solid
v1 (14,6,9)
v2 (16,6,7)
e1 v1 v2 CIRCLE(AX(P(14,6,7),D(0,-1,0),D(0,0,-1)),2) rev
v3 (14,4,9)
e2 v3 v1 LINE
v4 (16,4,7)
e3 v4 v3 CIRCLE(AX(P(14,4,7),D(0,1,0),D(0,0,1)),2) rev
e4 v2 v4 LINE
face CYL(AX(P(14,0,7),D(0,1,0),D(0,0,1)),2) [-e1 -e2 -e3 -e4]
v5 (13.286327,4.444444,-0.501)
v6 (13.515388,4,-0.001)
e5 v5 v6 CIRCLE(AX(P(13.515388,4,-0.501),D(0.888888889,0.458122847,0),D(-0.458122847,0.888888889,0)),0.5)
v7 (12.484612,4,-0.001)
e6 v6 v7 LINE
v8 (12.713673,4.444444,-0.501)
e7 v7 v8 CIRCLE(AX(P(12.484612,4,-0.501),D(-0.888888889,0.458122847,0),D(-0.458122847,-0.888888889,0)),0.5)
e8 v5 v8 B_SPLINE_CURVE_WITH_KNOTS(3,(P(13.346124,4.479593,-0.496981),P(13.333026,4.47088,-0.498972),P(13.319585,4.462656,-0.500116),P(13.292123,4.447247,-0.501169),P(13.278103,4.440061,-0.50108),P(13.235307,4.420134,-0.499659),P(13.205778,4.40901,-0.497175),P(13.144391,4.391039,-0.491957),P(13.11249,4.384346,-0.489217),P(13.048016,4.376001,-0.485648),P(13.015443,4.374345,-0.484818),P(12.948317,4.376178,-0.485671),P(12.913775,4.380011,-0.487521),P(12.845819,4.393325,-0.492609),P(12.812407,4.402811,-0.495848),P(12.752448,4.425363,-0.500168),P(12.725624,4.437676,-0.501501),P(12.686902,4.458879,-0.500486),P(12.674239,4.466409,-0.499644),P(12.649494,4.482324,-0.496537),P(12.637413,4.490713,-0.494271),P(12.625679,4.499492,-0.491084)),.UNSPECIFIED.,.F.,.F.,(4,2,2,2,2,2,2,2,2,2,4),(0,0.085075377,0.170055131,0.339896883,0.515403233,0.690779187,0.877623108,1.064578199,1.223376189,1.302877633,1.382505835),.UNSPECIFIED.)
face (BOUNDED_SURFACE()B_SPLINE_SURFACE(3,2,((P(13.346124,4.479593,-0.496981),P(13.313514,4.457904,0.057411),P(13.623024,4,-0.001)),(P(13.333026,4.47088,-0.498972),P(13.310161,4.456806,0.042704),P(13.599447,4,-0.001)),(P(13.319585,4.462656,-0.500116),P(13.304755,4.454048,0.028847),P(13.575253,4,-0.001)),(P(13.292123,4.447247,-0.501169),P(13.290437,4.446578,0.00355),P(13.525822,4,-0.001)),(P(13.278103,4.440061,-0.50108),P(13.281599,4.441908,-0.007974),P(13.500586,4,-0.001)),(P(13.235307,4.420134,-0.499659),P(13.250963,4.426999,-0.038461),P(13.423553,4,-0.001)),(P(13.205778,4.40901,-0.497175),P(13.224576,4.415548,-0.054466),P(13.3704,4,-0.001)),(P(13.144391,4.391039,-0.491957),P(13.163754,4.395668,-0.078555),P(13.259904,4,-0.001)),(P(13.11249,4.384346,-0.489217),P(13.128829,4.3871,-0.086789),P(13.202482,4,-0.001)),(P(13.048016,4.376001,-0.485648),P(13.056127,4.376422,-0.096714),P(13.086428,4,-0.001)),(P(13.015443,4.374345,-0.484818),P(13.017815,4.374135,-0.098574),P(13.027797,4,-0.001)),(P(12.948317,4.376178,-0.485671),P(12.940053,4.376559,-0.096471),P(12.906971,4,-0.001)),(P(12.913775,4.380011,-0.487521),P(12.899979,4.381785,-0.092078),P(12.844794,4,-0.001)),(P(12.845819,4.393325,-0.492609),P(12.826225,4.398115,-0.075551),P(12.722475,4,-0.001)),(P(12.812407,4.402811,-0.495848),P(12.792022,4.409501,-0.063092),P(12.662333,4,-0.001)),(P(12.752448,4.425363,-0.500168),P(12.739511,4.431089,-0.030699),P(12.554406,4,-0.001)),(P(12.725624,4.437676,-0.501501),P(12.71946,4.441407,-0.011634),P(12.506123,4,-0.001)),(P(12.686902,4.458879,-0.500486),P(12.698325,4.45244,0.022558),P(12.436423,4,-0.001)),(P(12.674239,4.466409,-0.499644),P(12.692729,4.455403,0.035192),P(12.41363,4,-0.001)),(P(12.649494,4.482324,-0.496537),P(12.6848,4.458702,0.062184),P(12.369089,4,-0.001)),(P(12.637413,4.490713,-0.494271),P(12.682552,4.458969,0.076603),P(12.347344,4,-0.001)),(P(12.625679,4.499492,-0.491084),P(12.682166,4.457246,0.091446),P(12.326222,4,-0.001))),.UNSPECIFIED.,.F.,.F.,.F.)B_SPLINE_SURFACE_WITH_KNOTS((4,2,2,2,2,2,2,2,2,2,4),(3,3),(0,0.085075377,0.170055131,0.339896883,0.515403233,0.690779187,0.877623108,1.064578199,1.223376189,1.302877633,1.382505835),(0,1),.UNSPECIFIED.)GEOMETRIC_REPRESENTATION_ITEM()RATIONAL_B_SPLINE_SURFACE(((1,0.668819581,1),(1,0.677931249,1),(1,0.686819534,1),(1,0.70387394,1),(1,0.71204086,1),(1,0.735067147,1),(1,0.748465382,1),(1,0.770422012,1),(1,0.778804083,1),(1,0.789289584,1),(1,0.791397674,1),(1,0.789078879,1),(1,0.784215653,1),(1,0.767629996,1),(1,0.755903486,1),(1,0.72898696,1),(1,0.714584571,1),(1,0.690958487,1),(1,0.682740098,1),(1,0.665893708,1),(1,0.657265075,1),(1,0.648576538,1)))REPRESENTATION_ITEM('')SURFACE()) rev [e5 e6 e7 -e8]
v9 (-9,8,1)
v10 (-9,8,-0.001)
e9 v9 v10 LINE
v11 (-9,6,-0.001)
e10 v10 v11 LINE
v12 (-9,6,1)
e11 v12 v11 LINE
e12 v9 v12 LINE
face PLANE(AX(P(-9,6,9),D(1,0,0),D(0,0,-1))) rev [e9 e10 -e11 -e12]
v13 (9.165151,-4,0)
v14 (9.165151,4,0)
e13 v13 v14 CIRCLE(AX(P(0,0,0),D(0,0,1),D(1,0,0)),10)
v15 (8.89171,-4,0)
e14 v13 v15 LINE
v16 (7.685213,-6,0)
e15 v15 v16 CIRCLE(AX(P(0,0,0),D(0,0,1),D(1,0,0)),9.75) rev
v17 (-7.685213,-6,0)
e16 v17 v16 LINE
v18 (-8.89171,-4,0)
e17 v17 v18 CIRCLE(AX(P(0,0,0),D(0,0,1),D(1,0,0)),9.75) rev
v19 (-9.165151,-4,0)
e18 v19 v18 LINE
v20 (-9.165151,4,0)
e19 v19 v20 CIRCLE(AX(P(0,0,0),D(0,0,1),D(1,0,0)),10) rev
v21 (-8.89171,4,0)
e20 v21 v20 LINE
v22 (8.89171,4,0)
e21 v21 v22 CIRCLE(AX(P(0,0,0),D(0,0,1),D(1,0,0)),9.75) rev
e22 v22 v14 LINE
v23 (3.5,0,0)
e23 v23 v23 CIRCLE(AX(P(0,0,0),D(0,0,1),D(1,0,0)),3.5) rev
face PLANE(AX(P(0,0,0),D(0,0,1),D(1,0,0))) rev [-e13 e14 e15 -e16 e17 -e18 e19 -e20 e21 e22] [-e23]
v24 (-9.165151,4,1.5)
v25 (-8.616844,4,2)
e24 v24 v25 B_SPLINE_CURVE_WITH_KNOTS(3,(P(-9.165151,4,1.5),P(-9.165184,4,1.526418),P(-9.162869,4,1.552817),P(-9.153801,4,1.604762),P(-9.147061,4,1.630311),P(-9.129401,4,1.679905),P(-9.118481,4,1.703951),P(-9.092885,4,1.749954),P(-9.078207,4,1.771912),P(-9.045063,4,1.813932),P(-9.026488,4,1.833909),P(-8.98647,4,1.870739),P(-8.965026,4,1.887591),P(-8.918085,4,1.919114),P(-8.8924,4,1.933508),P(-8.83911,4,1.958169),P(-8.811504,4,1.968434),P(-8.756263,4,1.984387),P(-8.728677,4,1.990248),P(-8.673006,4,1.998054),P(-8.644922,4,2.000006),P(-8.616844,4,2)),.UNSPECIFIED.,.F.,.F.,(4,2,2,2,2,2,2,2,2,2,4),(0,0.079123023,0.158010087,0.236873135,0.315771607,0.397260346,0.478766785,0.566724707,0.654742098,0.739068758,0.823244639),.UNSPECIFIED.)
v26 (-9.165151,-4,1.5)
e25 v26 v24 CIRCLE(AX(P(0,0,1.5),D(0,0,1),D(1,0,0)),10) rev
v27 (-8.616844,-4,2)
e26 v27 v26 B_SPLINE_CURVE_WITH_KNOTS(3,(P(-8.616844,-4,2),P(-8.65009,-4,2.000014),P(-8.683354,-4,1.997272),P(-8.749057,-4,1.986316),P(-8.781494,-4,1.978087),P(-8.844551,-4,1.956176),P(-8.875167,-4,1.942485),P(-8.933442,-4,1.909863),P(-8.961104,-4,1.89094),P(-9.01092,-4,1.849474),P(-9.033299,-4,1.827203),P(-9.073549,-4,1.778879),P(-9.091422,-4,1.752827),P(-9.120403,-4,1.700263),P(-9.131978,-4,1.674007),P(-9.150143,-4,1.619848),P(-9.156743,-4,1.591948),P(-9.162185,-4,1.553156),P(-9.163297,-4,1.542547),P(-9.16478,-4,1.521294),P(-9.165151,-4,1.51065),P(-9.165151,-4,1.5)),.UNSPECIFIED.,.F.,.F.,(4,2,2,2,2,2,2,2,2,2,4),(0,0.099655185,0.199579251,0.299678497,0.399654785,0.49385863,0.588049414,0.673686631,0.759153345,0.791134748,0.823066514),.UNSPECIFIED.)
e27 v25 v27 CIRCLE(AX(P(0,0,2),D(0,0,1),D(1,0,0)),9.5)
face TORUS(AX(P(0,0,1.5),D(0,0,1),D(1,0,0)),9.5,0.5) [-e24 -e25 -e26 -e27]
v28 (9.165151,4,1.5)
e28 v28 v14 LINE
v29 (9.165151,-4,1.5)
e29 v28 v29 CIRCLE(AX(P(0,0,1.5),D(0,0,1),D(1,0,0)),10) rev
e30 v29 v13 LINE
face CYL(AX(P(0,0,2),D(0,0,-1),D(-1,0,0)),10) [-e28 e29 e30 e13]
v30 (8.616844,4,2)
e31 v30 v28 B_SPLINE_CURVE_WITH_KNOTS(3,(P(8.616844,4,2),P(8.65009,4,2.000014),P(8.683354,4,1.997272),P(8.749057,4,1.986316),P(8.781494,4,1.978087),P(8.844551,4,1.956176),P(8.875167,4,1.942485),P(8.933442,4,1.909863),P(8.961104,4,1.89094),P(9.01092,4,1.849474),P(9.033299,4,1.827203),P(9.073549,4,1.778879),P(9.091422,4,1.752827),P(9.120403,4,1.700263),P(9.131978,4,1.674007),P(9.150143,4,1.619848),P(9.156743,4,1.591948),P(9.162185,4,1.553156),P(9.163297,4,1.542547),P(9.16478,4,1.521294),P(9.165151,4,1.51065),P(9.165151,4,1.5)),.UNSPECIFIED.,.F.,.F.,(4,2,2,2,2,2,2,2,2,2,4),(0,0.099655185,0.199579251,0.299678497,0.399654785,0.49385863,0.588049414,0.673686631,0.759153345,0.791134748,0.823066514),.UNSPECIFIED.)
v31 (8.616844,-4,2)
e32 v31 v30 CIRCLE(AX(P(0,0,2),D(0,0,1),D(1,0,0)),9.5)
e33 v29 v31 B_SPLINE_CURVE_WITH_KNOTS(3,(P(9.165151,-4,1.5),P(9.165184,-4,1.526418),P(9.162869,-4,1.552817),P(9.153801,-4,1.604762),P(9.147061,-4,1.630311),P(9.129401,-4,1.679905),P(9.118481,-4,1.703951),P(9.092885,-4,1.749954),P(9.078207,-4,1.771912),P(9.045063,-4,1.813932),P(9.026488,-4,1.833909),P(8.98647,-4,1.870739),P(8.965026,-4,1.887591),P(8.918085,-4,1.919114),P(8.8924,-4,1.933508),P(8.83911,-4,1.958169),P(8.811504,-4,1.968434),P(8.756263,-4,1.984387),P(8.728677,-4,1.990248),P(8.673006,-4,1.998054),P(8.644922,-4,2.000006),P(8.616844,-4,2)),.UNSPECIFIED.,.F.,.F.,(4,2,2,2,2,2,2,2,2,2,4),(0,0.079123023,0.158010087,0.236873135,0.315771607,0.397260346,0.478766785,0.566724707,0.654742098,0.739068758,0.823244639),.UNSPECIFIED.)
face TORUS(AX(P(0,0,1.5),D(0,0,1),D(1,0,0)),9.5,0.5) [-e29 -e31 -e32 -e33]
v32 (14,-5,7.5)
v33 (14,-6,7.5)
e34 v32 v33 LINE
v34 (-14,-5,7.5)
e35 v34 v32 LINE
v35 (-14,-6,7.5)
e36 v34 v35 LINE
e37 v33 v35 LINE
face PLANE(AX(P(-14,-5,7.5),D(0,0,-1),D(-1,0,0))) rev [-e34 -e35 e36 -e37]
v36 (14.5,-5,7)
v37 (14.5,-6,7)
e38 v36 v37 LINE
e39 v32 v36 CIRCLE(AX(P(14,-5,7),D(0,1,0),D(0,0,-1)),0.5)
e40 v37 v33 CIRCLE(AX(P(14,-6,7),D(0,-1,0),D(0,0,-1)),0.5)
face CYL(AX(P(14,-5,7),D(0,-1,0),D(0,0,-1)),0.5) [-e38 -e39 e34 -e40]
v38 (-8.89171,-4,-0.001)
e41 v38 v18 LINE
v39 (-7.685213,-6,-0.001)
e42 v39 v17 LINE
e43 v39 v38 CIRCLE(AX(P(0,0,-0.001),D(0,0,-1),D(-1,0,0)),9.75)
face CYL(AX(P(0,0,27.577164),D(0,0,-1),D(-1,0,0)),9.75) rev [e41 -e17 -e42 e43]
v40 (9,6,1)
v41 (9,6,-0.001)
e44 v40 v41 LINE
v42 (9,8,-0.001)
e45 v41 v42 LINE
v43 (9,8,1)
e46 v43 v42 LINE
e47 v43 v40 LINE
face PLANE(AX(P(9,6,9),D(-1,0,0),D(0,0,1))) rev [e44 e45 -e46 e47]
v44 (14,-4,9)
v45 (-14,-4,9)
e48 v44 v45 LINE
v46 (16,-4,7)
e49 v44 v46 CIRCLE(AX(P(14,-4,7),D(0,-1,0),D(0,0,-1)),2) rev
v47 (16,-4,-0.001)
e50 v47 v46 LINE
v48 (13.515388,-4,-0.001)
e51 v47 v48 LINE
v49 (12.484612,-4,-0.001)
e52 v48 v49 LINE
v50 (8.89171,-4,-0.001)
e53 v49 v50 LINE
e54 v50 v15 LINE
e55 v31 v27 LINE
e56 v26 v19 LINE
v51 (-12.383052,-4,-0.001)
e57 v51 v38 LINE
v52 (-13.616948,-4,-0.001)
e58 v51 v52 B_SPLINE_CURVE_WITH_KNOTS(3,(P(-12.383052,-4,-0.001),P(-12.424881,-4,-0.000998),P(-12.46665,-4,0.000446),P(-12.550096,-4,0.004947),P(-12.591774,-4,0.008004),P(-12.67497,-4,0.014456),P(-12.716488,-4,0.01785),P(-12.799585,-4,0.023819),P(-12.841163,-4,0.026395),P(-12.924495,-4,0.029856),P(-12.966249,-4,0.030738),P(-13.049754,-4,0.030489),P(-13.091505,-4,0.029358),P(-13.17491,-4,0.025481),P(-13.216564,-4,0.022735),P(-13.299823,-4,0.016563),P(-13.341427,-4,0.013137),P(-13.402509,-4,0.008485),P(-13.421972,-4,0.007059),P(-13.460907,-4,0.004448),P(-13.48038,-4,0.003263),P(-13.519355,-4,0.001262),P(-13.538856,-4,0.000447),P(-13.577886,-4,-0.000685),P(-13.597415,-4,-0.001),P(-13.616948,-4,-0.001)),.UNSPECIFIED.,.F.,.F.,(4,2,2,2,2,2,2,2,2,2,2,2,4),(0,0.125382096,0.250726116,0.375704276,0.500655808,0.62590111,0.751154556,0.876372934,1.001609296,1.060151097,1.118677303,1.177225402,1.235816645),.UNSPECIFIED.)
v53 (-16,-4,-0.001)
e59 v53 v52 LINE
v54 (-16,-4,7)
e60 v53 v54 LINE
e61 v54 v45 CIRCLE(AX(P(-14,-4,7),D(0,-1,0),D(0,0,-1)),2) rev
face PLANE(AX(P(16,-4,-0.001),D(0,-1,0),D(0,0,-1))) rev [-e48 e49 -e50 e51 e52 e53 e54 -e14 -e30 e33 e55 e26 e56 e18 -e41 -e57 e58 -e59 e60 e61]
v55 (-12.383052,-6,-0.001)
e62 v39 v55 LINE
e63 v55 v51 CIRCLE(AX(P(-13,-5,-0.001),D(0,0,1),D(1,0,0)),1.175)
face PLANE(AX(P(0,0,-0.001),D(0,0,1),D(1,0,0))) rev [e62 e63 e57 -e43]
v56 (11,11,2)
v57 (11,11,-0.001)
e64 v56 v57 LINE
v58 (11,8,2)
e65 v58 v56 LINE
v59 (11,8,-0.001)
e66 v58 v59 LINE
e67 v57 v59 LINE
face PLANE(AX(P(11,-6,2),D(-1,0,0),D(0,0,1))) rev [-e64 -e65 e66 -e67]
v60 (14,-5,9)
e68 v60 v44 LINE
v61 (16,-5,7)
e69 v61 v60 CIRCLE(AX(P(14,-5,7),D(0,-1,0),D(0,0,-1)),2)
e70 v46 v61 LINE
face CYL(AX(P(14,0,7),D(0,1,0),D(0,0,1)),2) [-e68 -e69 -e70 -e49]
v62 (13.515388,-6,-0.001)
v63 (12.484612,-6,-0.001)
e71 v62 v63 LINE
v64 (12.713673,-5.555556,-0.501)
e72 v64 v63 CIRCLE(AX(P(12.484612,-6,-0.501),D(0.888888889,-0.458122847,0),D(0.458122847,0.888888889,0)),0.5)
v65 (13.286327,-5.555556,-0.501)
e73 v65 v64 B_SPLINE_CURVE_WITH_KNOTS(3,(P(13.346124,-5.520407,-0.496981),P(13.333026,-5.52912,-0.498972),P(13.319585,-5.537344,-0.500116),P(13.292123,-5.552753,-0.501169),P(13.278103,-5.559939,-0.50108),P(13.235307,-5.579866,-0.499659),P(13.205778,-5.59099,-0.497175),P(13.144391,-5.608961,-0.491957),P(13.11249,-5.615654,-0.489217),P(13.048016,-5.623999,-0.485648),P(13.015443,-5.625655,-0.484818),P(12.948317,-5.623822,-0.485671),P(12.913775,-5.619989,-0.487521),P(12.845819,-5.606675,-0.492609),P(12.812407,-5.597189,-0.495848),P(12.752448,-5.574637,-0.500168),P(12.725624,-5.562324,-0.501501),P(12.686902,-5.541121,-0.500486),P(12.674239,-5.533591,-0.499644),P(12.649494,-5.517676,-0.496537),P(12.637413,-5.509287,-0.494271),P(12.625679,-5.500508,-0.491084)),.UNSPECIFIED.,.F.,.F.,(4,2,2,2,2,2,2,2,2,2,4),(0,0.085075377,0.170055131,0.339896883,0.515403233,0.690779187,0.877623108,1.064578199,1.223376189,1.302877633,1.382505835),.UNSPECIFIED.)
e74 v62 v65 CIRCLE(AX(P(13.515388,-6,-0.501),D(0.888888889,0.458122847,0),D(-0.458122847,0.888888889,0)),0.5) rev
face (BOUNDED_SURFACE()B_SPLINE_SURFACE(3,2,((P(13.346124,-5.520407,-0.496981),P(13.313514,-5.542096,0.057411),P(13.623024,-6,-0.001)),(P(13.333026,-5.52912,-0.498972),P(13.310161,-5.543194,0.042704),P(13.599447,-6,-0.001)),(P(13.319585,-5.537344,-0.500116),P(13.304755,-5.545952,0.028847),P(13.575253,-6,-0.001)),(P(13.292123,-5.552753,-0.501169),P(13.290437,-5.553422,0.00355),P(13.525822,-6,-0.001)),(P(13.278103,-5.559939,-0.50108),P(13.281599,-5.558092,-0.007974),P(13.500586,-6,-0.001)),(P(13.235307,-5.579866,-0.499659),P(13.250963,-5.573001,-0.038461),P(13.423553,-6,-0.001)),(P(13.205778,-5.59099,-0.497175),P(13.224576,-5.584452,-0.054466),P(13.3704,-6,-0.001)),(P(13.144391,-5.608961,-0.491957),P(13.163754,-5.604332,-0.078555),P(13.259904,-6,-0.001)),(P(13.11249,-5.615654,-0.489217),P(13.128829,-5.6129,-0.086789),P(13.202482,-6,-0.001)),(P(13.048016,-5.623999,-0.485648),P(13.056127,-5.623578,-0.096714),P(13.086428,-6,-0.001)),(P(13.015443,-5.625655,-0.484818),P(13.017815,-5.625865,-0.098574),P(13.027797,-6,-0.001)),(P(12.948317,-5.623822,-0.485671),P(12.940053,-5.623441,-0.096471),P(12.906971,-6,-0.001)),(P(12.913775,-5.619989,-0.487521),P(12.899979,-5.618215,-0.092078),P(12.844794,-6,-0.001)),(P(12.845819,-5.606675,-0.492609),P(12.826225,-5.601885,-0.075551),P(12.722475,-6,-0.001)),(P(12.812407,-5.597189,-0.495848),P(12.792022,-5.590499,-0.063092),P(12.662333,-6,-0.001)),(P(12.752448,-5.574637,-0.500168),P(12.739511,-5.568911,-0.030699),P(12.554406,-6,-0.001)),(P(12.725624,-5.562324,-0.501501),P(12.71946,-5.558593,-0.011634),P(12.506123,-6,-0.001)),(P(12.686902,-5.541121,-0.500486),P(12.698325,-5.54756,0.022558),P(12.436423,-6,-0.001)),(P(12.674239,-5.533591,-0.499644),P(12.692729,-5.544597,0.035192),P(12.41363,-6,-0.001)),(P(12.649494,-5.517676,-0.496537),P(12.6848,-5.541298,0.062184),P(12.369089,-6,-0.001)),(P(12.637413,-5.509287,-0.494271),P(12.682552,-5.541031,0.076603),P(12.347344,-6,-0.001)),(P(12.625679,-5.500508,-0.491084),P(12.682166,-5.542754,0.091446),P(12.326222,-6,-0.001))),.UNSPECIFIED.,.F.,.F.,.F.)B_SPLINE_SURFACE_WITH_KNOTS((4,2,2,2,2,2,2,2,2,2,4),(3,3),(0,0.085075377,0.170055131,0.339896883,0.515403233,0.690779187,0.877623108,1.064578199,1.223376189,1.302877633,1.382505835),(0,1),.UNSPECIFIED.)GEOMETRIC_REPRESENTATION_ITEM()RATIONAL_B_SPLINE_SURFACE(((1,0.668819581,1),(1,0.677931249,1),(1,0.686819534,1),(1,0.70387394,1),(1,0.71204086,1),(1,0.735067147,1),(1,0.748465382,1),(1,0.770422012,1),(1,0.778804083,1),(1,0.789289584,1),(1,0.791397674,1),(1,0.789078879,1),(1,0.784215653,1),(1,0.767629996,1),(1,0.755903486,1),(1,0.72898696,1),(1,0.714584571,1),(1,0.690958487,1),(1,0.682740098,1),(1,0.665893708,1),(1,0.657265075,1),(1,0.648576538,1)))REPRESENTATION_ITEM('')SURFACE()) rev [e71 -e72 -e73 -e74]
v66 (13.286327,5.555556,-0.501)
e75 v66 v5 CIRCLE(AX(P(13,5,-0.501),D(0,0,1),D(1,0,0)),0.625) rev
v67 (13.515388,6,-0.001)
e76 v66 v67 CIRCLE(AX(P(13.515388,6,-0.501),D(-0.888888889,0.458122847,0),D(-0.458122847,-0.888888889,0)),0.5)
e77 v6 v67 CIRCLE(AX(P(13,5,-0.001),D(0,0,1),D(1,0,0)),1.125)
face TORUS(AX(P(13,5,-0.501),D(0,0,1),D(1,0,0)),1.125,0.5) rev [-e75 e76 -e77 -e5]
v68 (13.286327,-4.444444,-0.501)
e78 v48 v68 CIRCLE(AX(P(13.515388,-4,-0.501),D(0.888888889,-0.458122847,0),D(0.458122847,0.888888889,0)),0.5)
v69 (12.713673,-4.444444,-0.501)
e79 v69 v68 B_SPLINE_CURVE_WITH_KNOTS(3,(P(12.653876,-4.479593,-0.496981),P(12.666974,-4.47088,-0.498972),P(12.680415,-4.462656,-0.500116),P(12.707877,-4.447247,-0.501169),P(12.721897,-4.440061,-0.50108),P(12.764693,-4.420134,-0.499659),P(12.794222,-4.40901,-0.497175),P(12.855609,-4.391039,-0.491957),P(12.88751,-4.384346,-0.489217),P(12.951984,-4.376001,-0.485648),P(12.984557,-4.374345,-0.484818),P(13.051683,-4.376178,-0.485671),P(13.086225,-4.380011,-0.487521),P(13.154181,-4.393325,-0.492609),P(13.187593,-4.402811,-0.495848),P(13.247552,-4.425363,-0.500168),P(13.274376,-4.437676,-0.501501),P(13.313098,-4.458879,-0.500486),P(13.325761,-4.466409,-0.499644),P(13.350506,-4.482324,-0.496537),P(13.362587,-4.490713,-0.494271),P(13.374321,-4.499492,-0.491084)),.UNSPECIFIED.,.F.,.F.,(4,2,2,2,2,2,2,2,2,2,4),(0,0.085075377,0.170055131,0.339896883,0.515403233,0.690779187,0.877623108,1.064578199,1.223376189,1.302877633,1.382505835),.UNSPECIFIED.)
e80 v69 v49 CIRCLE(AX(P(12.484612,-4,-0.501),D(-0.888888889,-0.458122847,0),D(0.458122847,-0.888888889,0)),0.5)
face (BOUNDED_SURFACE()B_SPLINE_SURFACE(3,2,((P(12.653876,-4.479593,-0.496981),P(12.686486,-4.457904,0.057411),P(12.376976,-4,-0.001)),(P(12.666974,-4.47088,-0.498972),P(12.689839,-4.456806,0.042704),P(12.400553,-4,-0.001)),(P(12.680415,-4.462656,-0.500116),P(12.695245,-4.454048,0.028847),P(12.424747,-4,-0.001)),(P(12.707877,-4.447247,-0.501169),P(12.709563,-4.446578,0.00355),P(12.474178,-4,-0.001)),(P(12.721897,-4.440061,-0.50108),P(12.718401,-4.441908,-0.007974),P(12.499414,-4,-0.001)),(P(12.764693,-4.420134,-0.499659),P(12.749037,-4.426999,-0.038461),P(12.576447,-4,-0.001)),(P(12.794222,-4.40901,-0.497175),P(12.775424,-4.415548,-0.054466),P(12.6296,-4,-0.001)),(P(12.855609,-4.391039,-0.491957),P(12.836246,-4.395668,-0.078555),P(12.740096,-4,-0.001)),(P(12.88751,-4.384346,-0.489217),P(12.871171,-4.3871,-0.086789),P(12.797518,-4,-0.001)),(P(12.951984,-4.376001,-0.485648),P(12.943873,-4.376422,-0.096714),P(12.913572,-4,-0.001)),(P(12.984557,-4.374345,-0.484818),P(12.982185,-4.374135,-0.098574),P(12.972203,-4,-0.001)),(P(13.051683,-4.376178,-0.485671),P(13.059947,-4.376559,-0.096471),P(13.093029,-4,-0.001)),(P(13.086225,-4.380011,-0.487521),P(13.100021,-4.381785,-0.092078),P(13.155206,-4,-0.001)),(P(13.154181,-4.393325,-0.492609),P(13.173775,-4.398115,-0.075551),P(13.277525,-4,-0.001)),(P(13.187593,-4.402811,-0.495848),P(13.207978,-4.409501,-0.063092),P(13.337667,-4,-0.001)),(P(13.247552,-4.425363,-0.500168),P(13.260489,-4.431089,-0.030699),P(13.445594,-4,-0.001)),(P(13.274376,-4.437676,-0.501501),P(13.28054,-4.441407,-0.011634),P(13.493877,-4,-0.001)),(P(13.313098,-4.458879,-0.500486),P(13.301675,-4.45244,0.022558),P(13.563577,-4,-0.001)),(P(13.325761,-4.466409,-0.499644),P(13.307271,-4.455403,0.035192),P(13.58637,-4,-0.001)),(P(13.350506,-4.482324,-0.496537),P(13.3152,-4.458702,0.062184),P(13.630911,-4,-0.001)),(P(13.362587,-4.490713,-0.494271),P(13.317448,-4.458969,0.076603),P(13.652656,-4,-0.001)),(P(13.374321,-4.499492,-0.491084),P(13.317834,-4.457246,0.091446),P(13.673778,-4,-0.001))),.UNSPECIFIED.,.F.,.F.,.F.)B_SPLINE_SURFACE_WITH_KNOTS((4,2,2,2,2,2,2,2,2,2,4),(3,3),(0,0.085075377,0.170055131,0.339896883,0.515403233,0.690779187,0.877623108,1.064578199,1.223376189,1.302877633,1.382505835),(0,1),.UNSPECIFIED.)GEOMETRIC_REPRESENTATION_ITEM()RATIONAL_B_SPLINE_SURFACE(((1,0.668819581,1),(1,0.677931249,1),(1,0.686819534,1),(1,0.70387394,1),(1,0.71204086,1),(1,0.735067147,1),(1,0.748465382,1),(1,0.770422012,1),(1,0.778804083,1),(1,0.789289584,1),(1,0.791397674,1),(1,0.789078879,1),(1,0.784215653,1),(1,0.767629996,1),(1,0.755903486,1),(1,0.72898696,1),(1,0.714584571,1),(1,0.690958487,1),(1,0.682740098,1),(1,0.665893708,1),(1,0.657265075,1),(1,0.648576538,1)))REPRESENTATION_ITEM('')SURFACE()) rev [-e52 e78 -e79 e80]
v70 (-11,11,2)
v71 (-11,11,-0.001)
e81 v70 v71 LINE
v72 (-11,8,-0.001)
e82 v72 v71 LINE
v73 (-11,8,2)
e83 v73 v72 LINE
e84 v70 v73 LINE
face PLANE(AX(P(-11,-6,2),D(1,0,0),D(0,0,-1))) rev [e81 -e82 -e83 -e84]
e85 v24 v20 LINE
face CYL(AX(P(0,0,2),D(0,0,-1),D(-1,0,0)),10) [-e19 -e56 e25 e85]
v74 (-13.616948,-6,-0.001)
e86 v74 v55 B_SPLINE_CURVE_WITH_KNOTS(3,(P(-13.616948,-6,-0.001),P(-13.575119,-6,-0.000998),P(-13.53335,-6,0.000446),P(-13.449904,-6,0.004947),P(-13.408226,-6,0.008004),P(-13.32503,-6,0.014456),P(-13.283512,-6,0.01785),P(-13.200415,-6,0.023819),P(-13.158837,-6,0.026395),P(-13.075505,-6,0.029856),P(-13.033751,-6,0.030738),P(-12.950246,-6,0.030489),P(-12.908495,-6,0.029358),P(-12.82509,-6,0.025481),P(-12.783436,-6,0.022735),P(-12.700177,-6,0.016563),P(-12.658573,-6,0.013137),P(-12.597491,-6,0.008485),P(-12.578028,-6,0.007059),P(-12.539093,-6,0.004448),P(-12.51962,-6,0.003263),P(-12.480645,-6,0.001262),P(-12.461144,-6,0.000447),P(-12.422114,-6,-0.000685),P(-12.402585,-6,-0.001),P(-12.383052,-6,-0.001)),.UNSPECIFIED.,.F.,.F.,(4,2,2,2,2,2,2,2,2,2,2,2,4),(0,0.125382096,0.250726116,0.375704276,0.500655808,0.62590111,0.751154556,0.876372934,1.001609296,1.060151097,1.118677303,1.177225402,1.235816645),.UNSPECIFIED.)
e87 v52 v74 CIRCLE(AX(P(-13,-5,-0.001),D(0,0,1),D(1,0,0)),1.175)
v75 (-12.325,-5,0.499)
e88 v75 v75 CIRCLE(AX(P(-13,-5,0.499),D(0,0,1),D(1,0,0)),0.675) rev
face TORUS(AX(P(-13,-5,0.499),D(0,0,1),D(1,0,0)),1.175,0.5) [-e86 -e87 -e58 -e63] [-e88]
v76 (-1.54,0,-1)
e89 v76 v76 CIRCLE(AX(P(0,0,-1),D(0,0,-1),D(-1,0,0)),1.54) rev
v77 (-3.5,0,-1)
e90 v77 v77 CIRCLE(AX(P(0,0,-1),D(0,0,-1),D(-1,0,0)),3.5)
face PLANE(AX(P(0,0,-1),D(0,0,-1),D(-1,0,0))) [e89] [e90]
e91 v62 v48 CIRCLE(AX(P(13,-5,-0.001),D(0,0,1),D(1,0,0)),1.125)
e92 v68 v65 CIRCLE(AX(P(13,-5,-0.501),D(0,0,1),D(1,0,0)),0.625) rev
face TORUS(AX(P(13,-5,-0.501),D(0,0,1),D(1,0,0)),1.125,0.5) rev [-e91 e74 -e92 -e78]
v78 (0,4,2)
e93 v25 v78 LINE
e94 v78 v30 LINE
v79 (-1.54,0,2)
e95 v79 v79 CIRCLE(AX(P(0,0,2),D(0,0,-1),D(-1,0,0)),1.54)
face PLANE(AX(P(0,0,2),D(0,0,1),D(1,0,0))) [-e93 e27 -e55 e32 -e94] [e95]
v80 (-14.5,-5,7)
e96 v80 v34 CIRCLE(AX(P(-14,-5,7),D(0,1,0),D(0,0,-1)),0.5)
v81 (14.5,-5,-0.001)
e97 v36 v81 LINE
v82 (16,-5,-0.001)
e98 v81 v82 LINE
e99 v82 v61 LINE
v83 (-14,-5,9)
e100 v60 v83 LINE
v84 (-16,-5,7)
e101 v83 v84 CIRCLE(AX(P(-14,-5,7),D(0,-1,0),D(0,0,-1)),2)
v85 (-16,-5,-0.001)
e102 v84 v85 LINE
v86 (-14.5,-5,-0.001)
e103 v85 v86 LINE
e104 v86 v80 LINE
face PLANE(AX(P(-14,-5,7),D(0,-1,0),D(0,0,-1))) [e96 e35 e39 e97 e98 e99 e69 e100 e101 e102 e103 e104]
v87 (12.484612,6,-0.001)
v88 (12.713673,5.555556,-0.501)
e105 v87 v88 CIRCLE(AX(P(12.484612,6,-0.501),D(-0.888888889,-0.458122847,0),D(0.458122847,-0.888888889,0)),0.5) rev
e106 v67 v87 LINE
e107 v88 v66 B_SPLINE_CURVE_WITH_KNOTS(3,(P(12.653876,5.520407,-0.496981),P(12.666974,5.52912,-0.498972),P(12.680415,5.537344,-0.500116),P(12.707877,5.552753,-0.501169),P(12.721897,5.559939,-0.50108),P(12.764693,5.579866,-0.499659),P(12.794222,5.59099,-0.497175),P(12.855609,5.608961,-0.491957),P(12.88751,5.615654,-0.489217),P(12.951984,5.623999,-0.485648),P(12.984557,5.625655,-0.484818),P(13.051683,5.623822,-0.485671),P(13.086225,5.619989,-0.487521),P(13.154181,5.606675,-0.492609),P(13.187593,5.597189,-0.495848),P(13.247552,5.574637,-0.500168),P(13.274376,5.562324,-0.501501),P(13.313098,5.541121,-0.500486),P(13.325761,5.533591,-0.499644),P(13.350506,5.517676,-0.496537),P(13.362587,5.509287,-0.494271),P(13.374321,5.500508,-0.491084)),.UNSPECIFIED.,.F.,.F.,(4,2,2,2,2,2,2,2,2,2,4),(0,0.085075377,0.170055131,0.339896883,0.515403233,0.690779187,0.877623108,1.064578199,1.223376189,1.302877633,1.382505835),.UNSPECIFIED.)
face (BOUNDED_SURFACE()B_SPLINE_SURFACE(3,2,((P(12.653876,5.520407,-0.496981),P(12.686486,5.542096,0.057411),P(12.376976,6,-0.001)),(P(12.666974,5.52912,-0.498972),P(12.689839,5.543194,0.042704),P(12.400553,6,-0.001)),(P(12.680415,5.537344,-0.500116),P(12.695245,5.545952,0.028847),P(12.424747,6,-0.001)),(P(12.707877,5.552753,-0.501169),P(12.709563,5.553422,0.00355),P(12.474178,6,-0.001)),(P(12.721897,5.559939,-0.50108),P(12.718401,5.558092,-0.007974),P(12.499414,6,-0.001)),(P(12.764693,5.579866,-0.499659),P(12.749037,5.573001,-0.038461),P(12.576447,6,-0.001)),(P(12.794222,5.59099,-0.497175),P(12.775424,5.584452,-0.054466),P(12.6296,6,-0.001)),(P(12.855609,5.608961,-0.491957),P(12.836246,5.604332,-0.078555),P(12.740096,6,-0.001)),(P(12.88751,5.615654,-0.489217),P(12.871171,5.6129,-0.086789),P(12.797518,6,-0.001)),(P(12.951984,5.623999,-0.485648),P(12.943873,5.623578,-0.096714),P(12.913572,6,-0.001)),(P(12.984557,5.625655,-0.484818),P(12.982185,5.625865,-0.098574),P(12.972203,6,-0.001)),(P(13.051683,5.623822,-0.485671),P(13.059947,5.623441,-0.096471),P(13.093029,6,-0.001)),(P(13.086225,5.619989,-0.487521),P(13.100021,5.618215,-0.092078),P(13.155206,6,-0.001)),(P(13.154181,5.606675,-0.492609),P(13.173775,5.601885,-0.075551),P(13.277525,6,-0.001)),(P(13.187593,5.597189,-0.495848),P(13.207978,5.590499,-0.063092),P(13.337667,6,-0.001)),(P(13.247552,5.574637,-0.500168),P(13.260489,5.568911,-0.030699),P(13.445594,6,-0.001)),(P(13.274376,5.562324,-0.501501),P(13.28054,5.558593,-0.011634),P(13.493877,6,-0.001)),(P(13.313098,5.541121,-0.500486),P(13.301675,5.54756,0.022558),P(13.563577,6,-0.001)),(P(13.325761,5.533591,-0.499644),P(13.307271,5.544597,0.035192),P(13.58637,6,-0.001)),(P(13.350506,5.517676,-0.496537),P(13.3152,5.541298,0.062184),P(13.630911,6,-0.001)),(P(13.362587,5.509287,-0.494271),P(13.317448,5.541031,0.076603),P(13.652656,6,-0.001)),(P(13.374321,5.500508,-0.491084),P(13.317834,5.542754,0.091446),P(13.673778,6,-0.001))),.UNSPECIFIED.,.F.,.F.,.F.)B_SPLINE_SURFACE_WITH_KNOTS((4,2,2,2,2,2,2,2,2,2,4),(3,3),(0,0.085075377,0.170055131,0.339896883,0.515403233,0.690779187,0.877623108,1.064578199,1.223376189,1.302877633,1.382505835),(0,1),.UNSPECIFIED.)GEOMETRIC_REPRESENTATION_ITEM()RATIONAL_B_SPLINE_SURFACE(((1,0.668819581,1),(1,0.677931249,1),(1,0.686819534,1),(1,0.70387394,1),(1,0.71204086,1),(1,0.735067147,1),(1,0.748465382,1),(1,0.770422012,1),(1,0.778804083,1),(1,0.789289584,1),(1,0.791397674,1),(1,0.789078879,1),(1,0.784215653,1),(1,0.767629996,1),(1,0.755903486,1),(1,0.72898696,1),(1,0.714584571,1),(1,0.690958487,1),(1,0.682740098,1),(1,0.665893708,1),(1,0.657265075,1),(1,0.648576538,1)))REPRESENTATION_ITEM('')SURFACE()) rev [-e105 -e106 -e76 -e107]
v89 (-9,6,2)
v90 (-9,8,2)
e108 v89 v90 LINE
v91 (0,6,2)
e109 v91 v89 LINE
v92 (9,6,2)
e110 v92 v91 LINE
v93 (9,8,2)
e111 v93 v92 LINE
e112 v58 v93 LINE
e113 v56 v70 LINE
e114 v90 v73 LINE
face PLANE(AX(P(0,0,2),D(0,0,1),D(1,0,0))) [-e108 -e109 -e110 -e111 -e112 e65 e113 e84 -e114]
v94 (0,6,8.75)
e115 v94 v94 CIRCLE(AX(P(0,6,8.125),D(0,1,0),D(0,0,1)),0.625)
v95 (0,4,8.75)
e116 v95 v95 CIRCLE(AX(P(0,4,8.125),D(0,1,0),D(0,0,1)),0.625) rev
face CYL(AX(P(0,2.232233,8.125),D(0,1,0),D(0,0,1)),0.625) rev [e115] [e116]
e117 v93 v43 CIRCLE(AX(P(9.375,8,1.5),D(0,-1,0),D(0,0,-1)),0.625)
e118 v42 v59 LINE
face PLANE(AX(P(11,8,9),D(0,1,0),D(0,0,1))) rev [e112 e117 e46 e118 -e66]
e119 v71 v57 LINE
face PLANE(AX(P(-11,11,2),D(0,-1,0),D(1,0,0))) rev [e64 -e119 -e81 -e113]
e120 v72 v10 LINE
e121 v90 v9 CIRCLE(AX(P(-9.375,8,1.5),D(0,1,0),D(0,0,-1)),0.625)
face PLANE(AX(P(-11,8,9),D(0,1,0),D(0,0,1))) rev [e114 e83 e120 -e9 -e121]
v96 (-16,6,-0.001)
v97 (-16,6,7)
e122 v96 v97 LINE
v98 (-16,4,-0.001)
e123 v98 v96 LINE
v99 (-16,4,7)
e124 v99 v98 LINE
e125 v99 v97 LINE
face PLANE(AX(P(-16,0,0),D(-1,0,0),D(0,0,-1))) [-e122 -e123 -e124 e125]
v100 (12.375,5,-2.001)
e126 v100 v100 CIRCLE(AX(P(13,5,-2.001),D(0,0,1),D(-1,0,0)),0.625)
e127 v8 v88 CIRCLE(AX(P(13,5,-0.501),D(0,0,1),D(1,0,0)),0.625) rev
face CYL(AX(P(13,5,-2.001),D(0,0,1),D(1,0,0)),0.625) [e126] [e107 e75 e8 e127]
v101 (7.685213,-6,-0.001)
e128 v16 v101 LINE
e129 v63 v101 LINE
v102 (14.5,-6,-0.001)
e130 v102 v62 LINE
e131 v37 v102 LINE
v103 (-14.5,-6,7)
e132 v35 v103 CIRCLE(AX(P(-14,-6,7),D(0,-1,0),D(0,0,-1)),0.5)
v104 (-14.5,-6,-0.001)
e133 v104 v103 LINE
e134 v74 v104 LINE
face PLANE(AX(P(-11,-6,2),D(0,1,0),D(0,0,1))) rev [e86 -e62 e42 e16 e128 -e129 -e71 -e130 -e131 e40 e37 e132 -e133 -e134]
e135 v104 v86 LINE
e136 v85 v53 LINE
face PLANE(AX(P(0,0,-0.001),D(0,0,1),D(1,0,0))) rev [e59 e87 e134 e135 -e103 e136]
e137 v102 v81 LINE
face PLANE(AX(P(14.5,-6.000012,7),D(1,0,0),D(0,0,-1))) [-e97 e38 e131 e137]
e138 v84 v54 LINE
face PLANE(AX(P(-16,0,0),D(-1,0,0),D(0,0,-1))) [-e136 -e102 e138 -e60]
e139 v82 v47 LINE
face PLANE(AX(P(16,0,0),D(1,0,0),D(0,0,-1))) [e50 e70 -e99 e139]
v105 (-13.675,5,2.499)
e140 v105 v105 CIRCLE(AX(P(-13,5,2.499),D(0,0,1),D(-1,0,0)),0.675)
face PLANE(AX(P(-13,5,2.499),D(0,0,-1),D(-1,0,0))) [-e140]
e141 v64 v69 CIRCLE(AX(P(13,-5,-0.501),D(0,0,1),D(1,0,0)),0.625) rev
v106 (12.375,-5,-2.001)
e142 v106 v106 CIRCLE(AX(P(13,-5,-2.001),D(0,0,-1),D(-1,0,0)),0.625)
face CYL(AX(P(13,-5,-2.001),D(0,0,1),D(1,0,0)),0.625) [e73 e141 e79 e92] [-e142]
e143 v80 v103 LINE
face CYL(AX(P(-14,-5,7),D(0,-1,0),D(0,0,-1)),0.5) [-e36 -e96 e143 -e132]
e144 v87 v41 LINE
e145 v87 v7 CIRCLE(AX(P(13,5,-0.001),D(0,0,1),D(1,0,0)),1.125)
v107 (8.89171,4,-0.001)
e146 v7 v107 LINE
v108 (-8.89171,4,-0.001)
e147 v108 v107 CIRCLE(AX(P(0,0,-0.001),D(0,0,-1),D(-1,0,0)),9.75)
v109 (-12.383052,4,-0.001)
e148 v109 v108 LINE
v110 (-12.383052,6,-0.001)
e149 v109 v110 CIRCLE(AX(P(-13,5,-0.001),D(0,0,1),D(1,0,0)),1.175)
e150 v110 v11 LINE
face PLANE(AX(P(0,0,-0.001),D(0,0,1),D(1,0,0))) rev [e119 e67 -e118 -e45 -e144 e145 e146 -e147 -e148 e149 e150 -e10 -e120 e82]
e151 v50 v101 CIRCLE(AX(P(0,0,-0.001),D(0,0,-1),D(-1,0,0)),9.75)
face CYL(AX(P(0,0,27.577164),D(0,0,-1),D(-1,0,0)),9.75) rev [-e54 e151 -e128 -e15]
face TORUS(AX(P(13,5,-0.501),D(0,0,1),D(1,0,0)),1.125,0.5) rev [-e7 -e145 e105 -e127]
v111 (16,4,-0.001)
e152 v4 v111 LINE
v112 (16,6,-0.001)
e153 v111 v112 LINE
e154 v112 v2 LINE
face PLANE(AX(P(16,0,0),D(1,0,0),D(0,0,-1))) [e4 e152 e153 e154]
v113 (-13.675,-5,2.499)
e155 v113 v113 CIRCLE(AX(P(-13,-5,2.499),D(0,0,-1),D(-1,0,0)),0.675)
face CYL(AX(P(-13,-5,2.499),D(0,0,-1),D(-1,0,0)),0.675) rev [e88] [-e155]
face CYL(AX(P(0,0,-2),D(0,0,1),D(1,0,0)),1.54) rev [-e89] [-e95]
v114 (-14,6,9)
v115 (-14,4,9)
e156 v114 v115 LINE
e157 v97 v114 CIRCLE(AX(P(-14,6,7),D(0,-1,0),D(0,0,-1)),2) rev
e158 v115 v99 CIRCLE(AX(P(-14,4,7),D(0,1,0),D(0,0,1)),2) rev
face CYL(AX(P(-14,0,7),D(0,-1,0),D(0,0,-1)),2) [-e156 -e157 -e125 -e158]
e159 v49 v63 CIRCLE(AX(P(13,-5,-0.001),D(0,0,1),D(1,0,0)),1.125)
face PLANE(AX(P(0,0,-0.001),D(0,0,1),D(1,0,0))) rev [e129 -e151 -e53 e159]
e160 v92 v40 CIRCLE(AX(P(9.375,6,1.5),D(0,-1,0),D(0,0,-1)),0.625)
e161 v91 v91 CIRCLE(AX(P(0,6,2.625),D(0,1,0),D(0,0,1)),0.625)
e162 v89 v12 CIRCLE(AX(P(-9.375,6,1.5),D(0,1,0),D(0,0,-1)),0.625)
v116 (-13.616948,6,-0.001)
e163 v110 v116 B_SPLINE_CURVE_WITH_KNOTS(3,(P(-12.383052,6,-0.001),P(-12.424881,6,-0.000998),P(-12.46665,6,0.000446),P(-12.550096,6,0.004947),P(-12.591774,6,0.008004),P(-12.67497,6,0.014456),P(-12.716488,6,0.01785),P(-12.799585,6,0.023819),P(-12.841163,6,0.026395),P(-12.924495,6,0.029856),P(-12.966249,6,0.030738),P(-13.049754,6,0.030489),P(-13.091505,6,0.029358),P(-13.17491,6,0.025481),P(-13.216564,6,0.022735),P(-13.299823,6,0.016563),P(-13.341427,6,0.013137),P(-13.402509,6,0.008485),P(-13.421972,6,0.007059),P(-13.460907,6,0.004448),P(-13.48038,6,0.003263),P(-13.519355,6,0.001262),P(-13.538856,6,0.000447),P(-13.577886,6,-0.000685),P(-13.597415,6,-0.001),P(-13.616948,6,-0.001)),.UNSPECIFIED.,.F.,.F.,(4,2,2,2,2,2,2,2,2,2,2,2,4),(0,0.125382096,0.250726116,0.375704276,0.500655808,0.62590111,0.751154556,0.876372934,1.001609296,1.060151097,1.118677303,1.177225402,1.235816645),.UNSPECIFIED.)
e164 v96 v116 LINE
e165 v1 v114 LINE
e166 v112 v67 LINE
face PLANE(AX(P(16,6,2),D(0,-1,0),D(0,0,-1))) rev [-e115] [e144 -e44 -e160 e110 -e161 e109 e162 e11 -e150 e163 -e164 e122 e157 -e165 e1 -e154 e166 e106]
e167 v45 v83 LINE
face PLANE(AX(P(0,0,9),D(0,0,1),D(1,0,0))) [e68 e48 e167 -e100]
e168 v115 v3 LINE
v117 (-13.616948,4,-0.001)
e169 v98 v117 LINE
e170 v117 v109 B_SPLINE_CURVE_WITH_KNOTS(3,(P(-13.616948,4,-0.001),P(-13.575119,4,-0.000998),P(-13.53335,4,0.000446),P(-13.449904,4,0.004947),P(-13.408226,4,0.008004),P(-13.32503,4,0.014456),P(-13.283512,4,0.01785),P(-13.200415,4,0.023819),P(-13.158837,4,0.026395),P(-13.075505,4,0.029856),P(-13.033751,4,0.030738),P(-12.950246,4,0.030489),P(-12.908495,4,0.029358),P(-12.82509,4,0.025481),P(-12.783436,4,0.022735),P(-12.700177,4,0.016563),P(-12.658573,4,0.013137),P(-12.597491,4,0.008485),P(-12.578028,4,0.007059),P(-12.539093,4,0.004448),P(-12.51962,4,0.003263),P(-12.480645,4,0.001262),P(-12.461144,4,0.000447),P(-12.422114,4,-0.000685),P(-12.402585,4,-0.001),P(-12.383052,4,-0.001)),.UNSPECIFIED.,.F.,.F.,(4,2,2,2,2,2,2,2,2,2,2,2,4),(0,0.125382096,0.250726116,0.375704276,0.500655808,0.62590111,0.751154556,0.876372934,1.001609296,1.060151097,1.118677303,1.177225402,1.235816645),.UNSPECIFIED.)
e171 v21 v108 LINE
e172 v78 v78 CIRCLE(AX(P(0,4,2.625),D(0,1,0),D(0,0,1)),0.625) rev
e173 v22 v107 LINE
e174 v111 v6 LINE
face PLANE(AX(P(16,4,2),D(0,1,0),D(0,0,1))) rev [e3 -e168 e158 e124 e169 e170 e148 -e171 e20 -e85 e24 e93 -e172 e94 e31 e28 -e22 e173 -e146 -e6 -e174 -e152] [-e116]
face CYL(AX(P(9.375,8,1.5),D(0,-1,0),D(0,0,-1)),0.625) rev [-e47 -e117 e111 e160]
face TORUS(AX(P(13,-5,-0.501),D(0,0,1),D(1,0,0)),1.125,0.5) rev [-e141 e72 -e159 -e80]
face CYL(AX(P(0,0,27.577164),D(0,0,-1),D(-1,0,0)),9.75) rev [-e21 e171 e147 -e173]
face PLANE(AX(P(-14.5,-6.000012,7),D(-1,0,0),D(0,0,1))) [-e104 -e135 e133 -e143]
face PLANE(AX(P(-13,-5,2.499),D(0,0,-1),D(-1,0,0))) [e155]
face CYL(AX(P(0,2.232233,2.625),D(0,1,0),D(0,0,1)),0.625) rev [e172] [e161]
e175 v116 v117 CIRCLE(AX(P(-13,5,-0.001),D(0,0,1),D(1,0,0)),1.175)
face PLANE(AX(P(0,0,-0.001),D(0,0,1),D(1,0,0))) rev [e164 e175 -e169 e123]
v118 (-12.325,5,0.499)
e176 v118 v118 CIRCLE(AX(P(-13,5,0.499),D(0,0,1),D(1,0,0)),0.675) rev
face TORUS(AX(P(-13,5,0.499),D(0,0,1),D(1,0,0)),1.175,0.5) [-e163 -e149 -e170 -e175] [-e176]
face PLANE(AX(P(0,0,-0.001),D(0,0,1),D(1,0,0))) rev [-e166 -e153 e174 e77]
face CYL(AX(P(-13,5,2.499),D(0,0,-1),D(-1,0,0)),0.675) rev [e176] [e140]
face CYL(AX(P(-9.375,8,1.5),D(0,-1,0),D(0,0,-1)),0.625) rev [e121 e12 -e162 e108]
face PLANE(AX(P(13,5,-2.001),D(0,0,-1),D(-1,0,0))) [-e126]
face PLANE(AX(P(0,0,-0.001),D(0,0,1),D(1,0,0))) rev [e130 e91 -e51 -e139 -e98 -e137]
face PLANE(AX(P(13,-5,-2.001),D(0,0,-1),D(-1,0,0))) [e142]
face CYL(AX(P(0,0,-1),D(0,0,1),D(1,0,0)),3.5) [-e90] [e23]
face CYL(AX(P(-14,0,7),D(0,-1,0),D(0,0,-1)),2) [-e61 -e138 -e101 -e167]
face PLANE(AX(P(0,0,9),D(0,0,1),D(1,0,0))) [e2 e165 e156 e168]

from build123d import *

# Parameters (mm, degrees)
BOSS_EXTRUDE1_DEPTH     = 2
SKETCH2_R               = 1.54
BOSS_EXTRUDE2_DEPTH     = 4
SKETCH3_R               = 3.5
BOSS_EXTRUDE3_DEPTH     = 1
SKETCH4_W               = 2
SKETCH4_H               = 17
BOSS_EXTRUDE4_DEPTH     = 0.001
SKETCH5_W               = 18
SKETCH5_H               = 2
BOSS_EXTRUDE5_DEPTH     = 0.001
SKETCH6_W               = 2.001
SKETCH6_H               = 2
BOSS_EXTRUDE6_DEPTH     = 5
BOSS_EXTRUDE7_DEPTH     = 0.001
CUT_EXTRUDE1_DEPTH      = 20.519323784
SKETCH9_W               = 2.937742252
SKETCH9_H               = 8
CUT_EXTRUDE2_DEPTH      = 0.001
CUT_EXTRUDE11_START     = -0.001
SKETCH21_R              = 9.75
SKETCH21_R_2            = 3.5
CUT_EXTRUDE11_DEPTH     = 0.001
SKETCH10_W              = 32
SKETCH10_H              = 2
BOSS_EXTRUDE8_DEPTH     = 7
FILLET1_R               = 0.5
SKETCH11_R              = 0.625
BOSS_EXTRUDE9_DEPTH     = 2
SKETCH14_W              = 2
SKETCH14_H              = 2
CUT_EXTRUDE5_DEPTH      = 22.401355237
SKETCH12_R              = 0.675
CUT_EXTRUDE3_DEPTH      = 2.5
CUT_EXTRUDE6_DEPTH      = 2
FILLET2_R               = 0.5
FILLET3_R               = 0.5
FILLET4_R               = 2
CUT_EXTRUDE7_DEPTH      = 26.019992106
CUT_EXTRUDE7_DEPTH_BACK = 1
SKETCH19_R              = 0.625
CUT_EXTRUDE9_DEPTH      = 2


with BuildPart() as part:
    # Sketch1 → Boss-Extrude1 (new body)
    with BuildSketch(Plane.XY):
        Polygon((-11, 6), (-11, 11), (11, 11), (11, 6), (11, -6), (-11, -6), align=None)
    extrude(amount=BOSS_EXTRUDE1_DEPTH)

    # Sketch3 → Boss-Extrude3 (add)
    with BuildSketch(Plane(origin=(0, 0, 0), x_dir=(-1, 0, 0), z_dir=(0, 0, -1))):
        with Locations(Location((0, 0, 0), (0, 0, 180))):
            Circle(SKETCH3_R)
    extrude(amount=BOSS_EXTRUDE3_DEPTH)

    # Sketch4 → Boss-Extrude4 (add)
    with BuildSketch(Plane(origin=(0, 0, 0), x_dir=(-1, 0, 0), z_dir=(0, 0, -1))):
        with Locations((10, 2.5)):
            Rectangle(SKETCH4_W, SKETCH4_H)
        with Locations((-10, 2.5)):
            Rectangle(SKETCH4_W, SKETCH4_H)
    extrude(amount=BOSS_EXTRUDE4_DEPTH)

    # Sketch5 → Boss-Extrude5 (add)
    with BuildSketch(Plane(origin=(0, 0, 0), x_dir=(-1, 0, 0), z_dir=(0, 0, -1))):
        with Locations((0, 10)):
            Rectangle(SKETCH5_W, SKETCH5_H)
    extrude(amount=BOSS_EXTRUDE5_DEPTH)

    # Sketch6 → Boss-Extrude6 (add)
    with BuildSketch(Plane(origin=(11, 0, 0), x_dir=(0, 0, -1), z_dir=(1, 0, 0))):
        with Locations((-0.9995, -5)):
            Rectangle(SKETCH6_W, SKETCH6_H)
        with Locations((-0.9995, 5)):
            Rectangle(SKETCH6_W, SKETCH6_H)
    boss_extrude6 = extrude(amount=BOSS_EXTRUDE6_DEPTH)

    # Mirror1: Boss-Extrude6 across plane
    add(boss_extrude6.mirror(Plane(origin=(0, 0, 0), x_dir=(0, 0, 1), z_dir=(1, 0, 0))))

    # Sketch7 → Boss-Extrude7 (add)
    with BuildSketch(Plane(origin=(0, 0, -0.001), x_dir=(-1, 0, 0), z_dir=(0, 0, -1))):
        with BuildLine():
            ThreePointArc((-6.708203932, -6), (-8.407551231, -3.211398808), (-9, 0))
            Line((-9, 0), (-9, -6))
            Line((-9, -6), (-6.708203932, -6))
        make_face()
        with BuildLine():
            Line((-9, 9), (-9, 0))
            ThreePointArc((-9, 0), (-6.363961031, 6.363961031), (0, 9))
            Line((0, 9), (-9, 9))
        make_face()
    boss_extrude7 = extrude(amount=-BOSS_EXTRUDE7_DEPTH)

    # Sketch8 → Cut-Extrude1 (cut, through all)
    with BuildSketch(Plane(origin=(0, 0, -0.001), x_dir=(-1, 0, 0), z_dir=(0, 0, -1))):
        with BuildLine():
            Line((-11, 4), (-9.16515139, 4))
            ThreePointArc((-9.16515139, 4), (-10, 0), (-9.16515139, -4))
            Line((-9.16515139, -4), (-11, -4))
            Line((-11, -4), (-11, 4))
        make_face()
    cut_extrude1 = extrude(amount=-CUT_EXTRUDE1_DEPTH, mode=Mode.SUBTRACT)

    # Sketch9 → Cut-Extrude2 (cut)
    with BuildSketch(Plane(origin=(0, 0, -0.001), x_dir=(-1, 0, 0), z_dir=(0, 0, -1))):
        with Locations((-9.531128874, 0)):
            Rectangle(SKETCH9_W, SKETCH9_H)
    cut_extrude2 = extrude(amount=-CUT_EXTRUDE2_DEPTH, mode=Mode.SUBTRACT)

    # Mirror2: Boss-Extrude7, Cut-Extrude1, Cut-Extrude2 across plane
    add(boss_extrude7.mirror(Plane(origin=(0, 0, 0), x_dir=(0, 0, 1), z_dir=(1, 0, 0))))
    add(cut_extrude1.mirror(Plane(origin=(0, 0, 0), x_dir=(0, 0, 1), z_dir=(1, 0, 0))), mode=Mode.SUBTRACT)
    add(cut_extrude2.mirror(Plane(origin=(0, 0, 0), x_dir=(0, 0, 1), z_dir=(1, 0, 0))), mode=Mode.SUBTRACT)

    # Sketch21 → Cut-Extrude11 (cut)
    with BuildSketch(Plane(origin=(0, 0, -0.001), x_dir=(-1, 0, 0), z_dir=(0, 0, -1)).offset(CUT_EXTRUDE11_START)):
        Circle(SKETCH21_R)
        with Locations(Location((0, 0, 0), (0, 0, 180))):
            Circle(SKETCH21_R_2, mode=Mode.SUBTRACT)
    extrude(amount=CUT_EXTRUDE11_DEPTH, mode=Mode.SUBTRACT)

    # Sketch10 → Boss-Extrude8 (add)
    with BuildSketch(Plane.XY.offset(2)):
        with Locations((0, -5)):
            Rectangle(SKETCH10_W, SKETCH10_H)
        with Locations((0, 5)):
            Rectangle(SKETCH10_W, SKETCH10_H)
    extrude(amount=BOSS_EXTRUDE8_DEPTH)

    # Fillet1
    fillet1_edges = [part.edges().sort_by_distance(p)[0] for p in [
        (10, 0, 2),
        (-10, 0, 2),
    ]]
    fillet(fillet1_edges, radius=FILLET1_R)

    # Sketch11 → Boss-Extrude9 (add)
    with BuildSketch(Plane(origin=(0, 0, -0.001), x_dir=(-1, 0, 0), z_dir=(0, 0, -1))):
        with Locations(Location((-13, -5, 0), (0, 0, 180))):
            Circle(SKETCH11_R)
    boss_extrude9 = extrude(amount=BOSS_EXTRUDE9_DEPTH)

    # Sketch14 → Cut-Extrude5 (cut, through all)
    with BuildSketch(Plane(origin=(0, 0, -0.001), x_dir=(-1, 0, 0), z_dir=(0, 0, -1))):
        with Locations((10, 7)):
            Rectangle(SKETCH14_W, SKETCH14_H)
        with Locations((-10, 7)):
            Rectangle(SKETCH14_W, SKETCH14_H)
    extrude(amount=-CUT_EXTRUDE5_DEPTH, mode=Mode.SUBTRACT)

    # Sketch12 → Cut-Extrude3 (cut)
    with BuildSketch(Plane(origin=(0, 0, -0.001), x_dir=(-1, 0, 0), z_dir=(0, 0, -1))):
        with Locations((13, -5)):
            Circle(SKETCH12_R)
    cut_extrude3 = extrude(amount=-CUT_EXTRUDE3_DEPTH, mode=Mode.SUBTRACT)

    # Sketch16 → Cut-Extrude6 (cut)
    with BuildSketch(Plane(origin=(0, 6, 0), x_dir=(1, 0, 0), z_dir=(0, 1, 0))):
        with BuildLine():
            Line((-9, -1), (-9, -2))
            ThreePointArc((-9, -2), (-8.75, -1.5), (-9, -1))
        make_face()
    cut_extrude6 = extrude(amount=CUT_EXTRUDE6_DEPTH, mode=Mode.SUBTRACT)

    # Mirror3: Boss-Extrude9, Cut-Extrude3 across plane
    add(boss_extrude9.mirror(Plane.ZX))
    add(cut_extrude3.mirror(Plane.ZX), mode=Mode.SUBTRACT)

    # Mirror4: Cut-Extrude6 across plane
    add(cut_extrude6.mirror(Plane(origin=(0, 0, 0), x_dir=(0, 0, 1), z_dir=(1, 0, 0))), mode=Mode.SUBTRACT)

    # Fillet2
    fillet2_edges = [part.edges().sort_by_distance(p)[0] for p in [
        (12.375, -5, -0.001),
        (12.375, 5, -0.001),
    ]]
    fillet(fillet2_edges, radius=FILLET2_R)

    # Fillet3
    # the kernel refuses this fillet: 0.5 mm, written as the material it takes off along each edge
    with BuildSketch(Plane(origin=(-13, -5, -0.001), x_dir=(-1, 0, 0), z_dir=(0, -1, 0))) as fillet3_piece_1:
        with BuildLine():
            CenterArc((0.675 + FILLET3_R, -FILLET3_R), FILLET3_R, 90, 90)
            Line((0.675, -FILLET3_R), (0.675, 0))
            Line((0.675, 0), (0.675 + FILLET3_R, 0))
        make_face()
    revolve(axis=Axis((-13, -5, -0.001), (0, 0, -1)), mode=Mode.SUBTRACT)
    with BuildSketch(Plane(origin=(-13, 5, -0.001), x_dir=(-1, 0, 0), z_dir=(0, 1, 0))) as fillet3_piece_2:
        with BuildLine():
            CenterArc((0.675 + FILLET3_R, FILLET3_R), FILLET3_R, 180, 90)
            Line((0.675, FILLET3_R), (0.675, 0))
            Line((0.675, 0), (0.675 + FILLET3_R, 0))
        make_face()
    revolve(axis=Axis((-13, 5, -0.001), (0, 0, 1)), mode=Mode.SUBTRACT)

    # Fillet4
    fillet4_edges = [part.edges().sort_by_distance(p)[0] for p in [
        (16, -5, 9),
        (-16, -5, 9),
        (-16, 5, 9),
        (16, 5, 9),
    ]]
    fillet(fillet4_edges, radius=FILLET4_R)

    # Sketch17 → Cut-Extrude7 (cut, two sides: drawn at the far end of the back side and taken through both)
    with BuildSketch(Plane.XZ.offset(6).offset(-CUT_EXTRUDE7_DEPTH_BACK)):
        with BuildLine():
            Line((-16, 7), (-16, -0.001))
            Line((-16, -0.001), (-14.5, -0.001))
            Line((-14.5, -0.001), (-14.5, 7))
            ThreePointArc((-14.5, 7), (-14.353553391, 7.353553391), (-14, 7.5))
            Line((-14, 7.5), (14, 7.5))
            ThreePointArc((14, 7.5), (14.353553391, 7.353553391), (14.5, 7))
            Line((14.5, 7), (14.5, -0.001))
            Line((14.5, -0.001), (16, -0.001))
            Line((16, -0.001), (16, 7))
            ThreePointArc((16, 7), (15.414213562, 8.414213562), (14, 9))
            Line((14, 9), (-14, 9))
            ThreePointArc((-14, 9), (-15.414213562, 8.414213562), (-16, 7))
        make_face()
    extrude(amount=CUT_EXTRUDE7_DEPTH + CUT_EXTRUDE7_DEPTH_BACK, mode=Mode.SUBTRACT)

    # Sketch19 → Cut-Extrude9 (cut)
    with BuildSketch(Plane(origin=(0, 6, 0), x_dir=(1, 0, 0), z_dir=(0, 1, 0))):
        with Locations(Location((0, -2.625, 0), (0, 0, 90))):
            Circle(SKETCH19_R)
        with Locations(Location((0, -8.125, 0), (0, 0, 270))):
            Circle(SKETCH19_R)
    extrude(amount=-CUT_EXTRUDE9_DEPTH, mode=Mode.SUBTRACT)


with BuildPart() as body_2:
    # Sketch2 → Boss-Extrude2 (new body)
    with BuildSketch(Plane(origin=(0, 0, 2), x_dir=(-1, 0, 0), z_dir=(0, 0, -1))):
        Circle(SKETCH2_R)
    extrude(amount=BOSS_EXTRUDE2_DEPTH)


with BuildPart() as part_1:
    add(part.part)

    # Combine2: cut body 2
    add(body_2.part, mode=Mode.SUBTRACT)


solid = part_1.part
